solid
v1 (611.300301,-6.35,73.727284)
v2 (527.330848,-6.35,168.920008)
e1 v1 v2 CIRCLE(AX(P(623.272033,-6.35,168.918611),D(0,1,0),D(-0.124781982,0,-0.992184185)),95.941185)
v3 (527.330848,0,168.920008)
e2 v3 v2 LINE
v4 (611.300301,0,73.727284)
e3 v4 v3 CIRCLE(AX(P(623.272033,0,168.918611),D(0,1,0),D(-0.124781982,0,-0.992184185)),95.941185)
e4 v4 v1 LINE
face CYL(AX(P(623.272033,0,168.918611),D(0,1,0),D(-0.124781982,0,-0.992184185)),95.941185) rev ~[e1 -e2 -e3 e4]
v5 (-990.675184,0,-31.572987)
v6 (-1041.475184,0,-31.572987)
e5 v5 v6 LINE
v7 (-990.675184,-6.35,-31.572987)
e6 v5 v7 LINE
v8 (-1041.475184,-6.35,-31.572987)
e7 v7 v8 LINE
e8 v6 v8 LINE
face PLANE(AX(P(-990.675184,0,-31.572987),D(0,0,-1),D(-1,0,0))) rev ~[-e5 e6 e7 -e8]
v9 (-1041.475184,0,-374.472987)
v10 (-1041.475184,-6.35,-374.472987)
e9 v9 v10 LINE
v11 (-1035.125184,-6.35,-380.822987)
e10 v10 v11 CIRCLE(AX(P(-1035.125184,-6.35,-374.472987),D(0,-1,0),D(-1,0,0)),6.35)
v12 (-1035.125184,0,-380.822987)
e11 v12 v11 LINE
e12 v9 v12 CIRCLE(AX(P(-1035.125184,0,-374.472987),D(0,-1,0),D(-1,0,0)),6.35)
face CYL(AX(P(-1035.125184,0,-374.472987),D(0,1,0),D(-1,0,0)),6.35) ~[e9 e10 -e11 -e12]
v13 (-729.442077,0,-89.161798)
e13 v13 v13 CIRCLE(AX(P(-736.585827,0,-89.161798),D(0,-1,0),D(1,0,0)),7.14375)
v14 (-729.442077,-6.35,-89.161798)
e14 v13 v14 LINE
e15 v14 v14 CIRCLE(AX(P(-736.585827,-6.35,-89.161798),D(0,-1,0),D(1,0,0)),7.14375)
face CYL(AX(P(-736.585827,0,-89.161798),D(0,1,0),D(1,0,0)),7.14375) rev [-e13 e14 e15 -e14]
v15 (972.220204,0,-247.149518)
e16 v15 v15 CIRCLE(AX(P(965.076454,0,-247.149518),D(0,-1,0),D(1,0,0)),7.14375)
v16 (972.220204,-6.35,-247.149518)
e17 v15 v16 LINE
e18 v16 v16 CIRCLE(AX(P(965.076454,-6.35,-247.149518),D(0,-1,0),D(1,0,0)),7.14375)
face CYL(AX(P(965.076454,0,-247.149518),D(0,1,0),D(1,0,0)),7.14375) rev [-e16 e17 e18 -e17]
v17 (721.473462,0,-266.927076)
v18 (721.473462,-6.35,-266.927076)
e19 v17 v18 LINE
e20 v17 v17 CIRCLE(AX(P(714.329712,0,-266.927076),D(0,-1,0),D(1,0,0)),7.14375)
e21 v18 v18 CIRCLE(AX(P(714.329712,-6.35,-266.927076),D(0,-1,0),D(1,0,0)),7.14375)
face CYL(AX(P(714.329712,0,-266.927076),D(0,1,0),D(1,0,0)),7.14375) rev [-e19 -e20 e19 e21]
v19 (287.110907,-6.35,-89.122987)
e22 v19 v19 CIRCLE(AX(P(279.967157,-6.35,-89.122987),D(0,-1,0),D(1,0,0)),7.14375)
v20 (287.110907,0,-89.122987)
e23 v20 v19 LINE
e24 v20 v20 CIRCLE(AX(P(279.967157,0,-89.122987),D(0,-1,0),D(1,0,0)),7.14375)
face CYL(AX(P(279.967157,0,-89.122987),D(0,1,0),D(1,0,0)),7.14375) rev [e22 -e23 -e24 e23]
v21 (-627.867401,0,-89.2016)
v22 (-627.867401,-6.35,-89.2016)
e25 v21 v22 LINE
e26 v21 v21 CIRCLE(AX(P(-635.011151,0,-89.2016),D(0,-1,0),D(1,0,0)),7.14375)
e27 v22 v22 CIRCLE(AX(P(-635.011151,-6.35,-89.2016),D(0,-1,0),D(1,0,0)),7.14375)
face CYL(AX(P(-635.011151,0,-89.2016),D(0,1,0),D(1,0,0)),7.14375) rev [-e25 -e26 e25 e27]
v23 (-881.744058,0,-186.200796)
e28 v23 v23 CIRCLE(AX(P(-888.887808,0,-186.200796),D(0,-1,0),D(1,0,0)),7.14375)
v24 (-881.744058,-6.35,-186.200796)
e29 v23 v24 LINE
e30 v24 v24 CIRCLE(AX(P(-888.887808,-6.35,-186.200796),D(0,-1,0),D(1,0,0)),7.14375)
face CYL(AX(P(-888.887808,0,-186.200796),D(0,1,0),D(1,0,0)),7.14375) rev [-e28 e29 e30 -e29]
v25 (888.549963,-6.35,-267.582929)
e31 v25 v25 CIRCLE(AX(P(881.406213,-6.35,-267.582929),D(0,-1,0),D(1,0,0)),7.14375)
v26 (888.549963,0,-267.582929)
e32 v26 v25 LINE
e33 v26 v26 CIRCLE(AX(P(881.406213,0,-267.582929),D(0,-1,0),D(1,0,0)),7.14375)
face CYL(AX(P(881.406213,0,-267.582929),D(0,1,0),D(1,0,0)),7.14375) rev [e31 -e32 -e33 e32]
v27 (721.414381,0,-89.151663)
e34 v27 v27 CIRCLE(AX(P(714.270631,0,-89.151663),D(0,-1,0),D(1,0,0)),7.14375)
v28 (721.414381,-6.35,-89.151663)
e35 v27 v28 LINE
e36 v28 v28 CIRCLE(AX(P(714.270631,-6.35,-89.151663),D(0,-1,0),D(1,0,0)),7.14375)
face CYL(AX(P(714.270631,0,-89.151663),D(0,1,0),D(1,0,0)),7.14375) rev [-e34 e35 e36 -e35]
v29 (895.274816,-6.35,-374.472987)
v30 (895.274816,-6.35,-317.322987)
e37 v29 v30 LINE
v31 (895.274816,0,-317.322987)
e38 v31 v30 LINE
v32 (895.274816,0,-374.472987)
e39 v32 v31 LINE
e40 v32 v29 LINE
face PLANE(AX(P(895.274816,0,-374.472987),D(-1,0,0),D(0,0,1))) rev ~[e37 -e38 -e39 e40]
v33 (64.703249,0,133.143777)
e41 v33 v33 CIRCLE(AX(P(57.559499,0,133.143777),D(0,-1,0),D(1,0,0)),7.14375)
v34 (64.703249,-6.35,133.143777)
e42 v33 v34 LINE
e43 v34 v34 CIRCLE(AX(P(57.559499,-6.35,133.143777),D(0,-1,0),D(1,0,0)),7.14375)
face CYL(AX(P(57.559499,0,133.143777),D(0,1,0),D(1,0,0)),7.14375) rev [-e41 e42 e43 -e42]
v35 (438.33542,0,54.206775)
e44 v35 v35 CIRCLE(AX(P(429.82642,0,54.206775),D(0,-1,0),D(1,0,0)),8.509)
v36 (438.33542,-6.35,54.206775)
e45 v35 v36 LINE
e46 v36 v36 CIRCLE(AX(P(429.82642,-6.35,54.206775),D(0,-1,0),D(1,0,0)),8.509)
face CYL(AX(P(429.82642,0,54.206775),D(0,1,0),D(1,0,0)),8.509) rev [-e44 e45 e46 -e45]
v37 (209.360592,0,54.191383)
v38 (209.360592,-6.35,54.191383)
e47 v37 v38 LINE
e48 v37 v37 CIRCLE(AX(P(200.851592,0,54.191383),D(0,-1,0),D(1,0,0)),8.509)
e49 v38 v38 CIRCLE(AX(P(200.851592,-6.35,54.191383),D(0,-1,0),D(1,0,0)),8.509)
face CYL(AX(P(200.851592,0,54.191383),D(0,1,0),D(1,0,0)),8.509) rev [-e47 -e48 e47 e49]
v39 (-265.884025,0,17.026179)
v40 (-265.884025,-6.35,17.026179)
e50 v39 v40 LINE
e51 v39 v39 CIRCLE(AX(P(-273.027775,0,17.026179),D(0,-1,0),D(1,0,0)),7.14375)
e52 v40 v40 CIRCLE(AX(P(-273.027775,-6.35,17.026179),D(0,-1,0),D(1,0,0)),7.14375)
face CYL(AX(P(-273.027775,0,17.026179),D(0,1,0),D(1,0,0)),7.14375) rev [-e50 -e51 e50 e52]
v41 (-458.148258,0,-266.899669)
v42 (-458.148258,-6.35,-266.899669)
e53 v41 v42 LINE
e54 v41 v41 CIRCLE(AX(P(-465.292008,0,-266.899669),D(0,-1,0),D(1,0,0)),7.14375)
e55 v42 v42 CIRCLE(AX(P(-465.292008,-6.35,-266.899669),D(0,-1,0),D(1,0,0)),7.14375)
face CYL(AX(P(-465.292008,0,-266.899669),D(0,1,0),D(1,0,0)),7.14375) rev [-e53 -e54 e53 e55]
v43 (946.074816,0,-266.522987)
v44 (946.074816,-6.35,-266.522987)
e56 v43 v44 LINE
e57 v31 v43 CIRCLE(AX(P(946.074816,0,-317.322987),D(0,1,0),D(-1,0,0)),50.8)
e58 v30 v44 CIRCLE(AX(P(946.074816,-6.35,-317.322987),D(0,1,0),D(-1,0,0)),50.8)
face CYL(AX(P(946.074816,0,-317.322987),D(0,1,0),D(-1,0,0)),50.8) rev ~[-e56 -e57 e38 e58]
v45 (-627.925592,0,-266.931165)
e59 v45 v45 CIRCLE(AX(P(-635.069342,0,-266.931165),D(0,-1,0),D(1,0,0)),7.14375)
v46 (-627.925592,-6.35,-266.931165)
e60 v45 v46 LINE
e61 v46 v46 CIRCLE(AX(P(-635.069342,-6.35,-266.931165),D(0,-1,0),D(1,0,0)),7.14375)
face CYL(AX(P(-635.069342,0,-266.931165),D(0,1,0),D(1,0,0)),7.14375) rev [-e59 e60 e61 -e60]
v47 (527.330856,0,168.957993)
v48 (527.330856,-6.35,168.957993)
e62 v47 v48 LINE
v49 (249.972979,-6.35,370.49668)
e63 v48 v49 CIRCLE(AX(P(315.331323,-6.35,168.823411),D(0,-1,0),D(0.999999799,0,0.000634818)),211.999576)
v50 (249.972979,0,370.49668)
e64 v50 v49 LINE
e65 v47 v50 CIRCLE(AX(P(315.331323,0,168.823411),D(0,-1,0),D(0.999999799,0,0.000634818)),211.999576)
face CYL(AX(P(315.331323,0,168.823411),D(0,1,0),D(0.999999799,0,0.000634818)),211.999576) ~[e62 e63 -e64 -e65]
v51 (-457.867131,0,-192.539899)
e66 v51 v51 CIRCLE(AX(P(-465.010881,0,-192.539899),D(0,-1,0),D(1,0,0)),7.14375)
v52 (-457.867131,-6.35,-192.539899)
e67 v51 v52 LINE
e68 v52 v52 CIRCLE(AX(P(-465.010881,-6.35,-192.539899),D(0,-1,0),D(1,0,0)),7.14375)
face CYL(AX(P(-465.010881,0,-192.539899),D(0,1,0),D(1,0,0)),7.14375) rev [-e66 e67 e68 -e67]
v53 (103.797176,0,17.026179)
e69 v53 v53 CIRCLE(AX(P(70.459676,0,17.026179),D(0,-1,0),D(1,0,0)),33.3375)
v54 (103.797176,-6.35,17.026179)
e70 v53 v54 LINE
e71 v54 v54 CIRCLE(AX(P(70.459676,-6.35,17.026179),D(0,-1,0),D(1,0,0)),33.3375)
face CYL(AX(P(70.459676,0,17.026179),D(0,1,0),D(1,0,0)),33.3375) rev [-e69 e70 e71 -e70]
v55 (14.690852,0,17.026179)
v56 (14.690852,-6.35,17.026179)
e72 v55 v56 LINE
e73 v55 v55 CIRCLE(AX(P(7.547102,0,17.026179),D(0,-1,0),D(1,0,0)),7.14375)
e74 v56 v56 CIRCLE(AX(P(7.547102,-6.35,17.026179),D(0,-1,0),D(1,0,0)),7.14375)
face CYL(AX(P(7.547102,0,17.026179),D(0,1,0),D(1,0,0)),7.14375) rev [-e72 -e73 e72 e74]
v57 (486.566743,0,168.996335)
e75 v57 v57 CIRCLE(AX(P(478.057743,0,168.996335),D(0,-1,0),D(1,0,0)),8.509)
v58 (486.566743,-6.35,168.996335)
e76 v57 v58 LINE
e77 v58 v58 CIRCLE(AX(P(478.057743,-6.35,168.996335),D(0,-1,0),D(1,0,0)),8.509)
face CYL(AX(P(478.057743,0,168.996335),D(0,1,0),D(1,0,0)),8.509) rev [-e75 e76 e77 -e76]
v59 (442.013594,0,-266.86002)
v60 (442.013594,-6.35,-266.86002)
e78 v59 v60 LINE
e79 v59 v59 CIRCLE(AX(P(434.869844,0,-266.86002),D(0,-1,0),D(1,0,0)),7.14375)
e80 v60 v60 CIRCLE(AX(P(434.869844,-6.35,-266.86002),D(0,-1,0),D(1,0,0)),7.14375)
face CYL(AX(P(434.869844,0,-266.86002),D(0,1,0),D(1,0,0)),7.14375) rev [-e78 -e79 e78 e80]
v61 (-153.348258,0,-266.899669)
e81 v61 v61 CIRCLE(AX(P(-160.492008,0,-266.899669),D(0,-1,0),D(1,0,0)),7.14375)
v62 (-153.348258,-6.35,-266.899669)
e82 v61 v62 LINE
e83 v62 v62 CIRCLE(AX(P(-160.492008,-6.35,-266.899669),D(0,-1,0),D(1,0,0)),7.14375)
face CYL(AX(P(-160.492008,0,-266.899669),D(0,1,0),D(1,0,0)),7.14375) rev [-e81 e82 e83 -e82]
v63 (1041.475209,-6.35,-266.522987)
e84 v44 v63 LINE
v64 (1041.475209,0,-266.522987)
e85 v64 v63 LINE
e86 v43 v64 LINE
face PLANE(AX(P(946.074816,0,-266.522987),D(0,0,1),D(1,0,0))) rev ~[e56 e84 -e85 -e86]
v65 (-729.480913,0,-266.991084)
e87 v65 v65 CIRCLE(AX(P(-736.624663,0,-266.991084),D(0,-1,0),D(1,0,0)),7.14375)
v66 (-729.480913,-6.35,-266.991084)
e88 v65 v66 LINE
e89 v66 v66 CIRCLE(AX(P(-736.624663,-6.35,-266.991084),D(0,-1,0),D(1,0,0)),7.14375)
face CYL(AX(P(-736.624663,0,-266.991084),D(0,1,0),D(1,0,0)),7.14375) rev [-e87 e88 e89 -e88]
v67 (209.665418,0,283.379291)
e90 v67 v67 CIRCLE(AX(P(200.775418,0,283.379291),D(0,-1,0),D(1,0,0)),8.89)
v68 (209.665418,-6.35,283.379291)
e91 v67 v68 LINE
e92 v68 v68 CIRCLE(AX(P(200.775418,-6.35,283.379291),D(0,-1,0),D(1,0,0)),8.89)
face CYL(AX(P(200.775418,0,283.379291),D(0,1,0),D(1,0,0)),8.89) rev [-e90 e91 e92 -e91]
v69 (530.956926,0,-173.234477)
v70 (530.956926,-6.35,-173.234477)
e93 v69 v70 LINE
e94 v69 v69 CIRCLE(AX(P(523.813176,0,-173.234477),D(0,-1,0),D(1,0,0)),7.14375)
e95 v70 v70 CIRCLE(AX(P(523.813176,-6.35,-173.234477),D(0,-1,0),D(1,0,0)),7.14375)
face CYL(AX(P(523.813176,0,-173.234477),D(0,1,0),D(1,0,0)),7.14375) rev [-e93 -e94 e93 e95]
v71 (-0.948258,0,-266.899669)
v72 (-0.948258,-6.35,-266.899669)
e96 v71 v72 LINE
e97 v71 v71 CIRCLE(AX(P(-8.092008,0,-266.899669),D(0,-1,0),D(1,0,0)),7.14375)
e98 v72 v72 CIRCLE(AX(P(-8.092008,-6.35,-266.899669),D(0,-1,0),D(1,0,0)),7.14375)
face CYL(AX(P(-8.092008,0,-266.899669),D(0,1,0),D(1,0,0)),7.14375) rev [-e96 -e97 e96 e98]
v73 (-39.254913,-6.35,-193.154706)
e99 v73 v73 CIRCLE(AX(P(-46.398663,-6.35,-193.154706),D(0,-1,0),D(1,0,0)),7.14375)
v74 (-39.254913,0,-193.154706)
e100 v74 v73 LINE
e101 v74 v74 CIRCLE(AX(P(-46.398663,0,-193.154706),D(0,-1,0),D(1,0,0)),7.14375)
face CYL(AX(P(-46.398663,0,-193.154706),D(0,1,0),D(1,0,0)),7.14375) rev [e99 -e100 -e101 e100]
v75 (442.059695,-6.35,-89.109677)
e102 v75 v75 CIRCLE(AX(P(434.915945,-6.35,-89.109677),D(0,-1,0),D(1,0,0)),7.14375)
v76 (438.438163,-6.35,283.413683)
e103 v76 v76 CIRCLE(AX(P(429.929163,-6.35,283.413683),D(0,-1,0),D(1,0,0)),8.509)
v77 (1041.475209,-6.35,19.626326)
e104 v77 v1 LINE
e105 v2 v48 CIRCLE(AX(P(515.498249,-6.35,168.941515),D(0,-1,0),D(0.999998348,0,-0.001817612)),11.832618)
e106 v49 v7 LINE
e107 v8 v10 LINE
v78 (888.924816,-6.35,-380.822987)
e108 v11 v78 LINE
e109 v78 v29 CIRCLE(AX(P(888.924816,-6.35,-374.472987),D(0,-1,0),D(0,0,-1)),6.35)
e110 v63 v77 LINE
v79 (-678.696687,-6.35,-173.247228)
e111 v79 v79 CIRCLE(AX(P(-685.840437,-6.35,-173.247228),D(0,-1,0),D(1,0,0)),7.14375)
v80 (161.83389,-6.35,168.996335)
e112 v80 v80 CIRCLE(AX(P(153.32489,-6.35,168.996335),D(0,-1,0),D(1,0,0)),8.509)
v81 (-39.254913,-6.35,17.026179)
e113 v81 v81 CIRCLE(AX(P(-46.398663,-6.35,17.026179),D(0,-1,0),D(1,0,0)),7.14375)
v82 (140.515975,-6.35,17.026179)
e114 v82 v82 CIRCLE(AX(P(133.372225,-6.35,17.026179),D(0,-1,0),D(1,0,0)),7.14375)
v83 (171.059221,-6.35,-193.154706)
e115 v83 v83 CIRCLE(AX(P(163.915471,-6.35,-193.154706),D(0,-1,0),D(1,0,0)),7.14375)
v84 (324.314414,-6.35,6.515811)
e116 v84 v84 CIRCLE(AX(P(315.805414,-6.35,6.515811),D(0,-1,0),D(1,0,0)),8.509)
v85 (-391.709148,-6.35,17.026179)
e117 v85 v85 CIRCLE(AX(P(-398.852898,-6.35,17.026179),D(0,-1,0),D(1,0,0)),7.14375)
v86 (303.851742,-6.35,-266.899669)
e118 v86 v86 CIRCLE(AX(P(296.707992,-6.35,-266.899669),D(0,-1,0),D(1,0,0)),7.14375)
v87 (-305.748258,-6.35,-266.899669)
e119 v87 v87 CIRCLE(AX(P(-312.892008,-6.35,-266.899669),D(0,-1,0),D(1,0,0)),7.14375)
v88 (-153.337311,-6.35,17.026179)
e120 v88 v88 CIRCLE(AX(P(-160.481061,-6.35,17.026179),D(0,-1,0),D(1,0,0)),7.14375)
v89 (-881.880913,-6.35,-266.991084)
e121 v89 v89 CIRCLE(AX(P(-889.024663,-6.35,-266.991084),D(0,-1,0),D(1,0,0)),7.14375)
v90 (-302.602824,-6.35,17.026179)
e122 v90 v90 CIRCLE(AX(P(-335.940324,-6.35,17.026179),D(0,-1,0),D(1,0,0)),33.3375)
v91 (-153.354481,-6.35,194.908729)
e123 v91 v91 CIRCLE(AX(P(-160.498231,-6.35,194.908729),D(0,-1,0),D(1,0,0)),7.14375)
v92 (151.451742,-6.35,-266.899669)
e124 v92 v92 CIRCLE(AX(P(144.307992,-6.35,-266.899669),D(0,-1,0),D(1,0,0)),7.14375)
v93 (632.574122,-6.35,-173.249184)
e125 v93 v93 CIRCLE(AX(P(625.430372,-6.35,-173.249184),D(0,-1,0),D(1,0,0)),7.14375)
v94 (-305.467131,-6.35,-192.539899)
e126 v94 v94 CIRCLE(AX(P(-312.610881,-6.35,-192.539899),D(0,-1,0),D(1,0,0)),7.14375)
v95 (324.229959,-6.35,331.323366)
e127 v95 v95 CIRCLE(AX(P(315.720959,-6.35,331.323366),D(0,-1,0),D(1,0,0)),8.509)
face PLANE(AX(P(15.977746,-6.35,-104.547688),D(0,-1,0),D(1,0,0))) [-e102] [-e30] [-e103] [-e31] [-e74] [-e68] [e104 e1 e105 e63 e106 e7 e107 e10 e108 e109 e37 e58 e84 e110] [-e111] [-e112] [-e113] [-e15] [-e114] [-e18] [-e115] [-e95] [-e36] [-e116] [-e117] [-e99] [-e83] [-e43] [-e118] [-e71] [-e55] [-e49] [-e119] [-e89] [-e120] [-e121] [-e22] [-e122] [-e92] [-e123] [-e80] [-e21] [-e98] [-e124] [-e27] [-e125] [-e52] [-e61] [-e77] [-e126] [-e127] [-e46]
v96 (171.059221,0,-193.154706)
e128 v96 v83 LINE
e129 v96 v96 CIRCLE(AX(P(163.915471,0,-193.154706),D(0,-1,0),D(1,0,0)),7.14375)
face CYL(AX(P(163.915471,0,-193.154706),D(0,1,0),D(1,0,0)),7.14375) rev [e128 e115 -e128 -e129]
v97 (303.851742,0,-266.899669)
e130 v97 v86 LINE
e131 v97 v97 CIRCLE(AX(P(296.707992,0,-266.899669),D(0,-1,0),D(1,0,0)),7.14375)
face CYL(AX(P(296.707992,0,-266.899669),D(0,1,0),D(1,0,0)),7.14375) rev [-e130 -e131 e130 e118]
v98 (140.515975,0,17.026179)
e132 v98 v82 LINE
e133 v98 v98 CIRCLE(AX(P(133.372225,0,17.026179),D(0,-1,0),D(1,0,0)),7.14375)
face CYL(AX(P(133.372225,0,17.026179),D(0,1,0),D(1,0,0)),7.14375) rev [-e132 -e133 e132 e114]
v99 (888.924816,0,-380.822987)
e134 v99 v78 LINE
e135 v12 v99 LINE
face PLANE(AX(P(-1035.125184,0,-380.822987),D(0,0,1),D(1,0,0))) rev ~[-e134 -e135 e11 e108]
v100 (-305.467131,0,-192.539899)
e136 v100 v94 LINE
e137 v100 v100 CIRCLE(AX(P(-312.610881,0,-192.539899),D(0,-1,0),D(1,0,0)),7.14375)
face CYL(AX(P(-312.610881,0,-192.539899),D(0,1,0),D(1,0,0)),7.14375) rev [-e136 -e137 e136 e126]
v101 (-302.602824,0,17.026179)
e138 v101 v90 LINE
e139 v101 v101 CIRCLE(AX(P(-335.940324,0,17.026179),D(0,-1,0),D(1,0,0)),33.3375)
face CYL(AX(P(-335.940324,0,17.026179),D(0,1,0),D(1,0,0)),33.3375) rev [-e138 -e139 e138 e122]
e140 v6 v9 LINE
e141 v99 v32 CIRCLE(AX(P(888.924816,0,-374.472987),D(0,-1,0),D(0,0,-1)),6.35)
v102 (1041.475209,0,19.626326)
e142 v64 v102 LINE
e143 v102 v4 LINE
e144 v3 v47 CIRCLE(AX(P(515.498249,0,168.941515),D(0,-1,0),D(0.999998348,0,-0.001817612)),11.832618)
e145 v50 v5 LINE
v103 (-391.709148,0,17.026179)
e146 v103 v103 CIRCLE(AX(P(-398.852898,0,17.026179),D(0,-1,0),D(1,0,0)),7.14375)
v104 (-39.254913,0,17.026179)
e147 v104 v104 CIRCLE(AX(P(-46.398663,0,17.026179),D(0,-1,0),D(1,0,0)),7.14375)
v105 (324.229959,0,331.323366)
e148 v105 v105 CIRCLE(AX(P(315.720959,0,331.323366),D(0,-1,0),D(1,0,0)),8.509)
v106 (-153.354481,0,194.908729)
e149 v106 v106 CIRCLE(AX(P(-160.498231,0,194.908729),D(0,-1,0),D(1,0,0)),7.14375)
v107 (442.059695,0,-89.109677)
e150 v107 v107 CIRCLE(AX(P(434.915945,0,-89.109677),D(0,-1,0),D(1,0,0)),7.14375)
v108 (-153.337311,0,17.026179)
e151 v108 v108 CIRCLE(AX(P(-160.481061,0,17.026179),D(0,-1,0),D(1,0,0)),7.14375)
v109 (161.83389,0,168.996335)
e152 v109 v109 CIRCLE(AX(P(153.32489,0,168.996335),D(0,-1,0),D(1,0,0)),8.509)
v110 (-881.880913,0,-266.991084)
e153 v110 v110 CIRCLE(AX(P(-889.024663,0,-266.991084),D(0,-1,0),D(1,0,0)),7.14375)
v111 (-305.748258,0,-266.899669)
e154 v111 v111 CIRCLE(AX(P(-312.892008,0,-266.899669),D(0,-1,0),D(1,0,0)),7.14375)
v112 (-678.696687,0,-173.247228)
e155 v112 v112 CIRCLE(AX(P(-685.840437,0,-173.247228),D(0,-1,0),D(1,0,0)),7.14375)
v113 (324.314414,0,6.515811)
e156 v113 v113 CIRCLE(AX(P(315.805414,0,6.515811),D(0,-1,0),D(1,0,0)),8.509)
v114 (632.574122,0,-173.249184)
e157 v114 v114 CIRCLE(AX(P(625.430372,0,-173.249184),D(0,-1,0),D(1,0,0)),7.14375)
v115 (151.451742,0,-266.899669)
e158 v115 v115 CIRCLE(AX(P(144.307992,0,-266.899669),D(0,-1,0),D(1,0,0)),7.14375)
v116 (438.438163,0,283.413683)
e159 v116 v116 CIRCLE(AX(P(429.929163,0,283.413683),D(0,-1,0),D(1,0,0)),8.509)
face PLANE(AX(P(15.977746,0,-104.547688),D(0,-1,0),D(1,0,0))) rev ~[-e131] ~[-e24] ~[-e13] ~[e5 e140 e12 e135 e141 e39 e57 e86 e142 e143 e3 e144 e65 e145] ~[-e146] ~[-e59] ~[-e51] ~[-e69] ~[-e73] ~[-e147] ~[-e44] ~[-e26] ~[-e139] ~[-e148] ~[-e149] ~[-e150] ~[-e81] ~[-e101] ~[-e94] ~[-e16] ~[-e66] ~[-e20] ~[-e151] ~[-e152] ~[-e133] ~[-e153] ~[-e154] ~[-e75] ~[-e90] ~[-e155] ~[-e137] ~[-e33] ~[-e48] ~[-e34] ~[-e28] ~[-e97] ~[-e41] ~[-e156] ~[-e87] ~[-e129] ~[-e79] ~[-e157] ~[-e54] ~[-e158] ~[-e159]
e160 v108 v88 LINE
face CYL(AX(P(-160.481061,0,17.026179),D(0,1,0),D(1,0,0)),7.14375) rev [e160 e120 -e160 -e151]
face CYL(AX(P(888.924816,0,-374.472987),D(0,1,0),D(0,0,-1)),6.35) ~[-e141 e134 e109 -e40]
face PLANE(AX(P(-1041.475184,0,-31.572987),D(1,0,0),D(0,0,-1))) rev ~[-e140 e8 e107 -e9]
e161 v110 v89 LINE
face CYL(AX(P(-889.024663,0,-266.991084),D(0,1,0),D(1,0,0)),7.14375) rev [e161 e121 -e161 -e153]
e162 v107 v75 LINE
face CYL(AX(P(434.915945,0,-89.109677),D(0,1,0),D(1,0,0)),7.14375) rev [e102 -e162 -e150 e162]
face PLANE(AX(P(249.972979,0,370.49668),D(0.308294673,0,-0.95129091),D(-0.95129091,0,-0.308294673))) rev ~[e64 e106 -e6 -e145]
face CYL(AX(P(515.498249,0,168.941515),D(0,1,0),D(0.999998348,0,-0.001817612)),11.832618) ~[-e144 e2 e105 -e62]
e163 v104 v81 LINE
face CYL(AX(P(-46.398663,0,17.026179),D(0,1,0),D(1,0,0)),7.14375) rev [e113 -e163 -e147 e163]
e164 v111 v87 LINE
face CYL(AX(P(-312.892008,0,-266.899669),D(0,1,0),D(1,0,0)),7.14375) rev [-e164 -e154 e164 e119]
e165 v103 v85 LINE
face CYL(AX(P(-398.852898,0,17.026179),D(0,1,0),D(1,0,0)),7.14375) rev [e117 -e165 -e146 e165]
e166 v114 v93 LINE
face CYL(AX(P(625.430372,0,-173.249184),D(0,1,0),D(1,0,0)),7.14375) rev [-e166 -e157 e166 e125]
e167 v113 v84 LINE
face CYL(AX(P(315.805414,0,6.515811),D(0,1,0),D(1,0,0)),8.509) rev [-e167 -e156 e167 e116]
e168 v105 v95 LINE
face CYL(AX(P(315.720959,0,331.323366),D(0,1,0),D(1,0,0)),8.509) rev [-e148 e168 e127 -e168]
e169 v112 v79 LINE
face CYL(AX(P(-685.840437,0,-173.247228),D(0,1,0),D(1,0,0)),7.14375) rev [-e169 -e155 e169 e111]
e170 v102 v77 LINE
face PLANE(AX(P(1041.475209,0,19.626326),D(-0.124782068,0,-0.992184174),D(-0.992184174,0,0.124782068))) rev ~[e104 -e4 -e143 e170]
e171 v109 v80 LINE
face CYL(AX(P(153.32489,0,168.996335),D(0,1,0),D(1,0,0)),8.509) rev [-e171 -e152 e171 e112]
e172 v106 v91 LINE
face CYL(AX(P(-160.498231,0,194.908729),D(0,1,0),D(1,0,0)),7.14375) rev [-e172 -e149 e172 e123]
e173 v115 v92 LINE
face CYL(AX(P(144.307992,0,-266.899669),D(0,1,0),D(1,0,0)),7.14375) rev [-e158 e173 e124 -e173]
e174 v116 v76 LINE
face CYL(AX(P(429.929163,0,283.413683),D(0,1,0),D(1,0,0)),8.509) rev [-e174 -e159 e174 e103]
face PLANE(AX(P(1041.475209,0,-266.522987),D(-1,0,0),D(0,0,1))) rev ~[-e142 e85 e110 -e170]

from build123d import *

# Parameters (mm, degrees)
F0_R     = 7.14375
F0_R_2   = 33.3375
F0_R_3   = 8.509
F0_R_4   = 8.89
F1_DEPTH = 6.35


# Not quite as in the source:
# - ends of sketch curves that miss each other by under 0.0002 mm in the source are joined


with BuildPart() as f1:
    # F0 (on Front) → F1 (new body)
    with BuildSketch(Plane.XZ):
        with BuildLine():
            Line((-990.675184, -31.5729874), (-1041.475184, -31.5729874))
            Line((-1041.475184, -31.5729874), (-1041.475184, -374.4729874))
            ThreePointArc((-1041.475184, -374.4729874), (-1039.6153120605, -378.9631154605), (-1035.125184, -380.8229874))
            Line((-1035.125184, -380.8229874), (888.924816, -380.8229874))
            ThreePointArc((888.924816, -380.8229874), (893.4149440605, -378.9631154605), (895.274816, -374.4729874))
            Line((895.274816, -374.4729874), (895.274816, -317.3229874))
            ThreePointArc((895.274816, -317.3229874), (910.1537915157, -281.4019629157), (946.074816, -266.5229874))
            Line((946.074816, -266.5229874), (1041.4752094, -266.5229874))
            Line((1041.4752094, -266.5229874), (1041.4752094, 19.626326))
            Line((1041.4752094, 19.626326), (611.3003013693, 73.7272843556))
            ThreePointArc((611.3003013693, 73.7272843556), (551.322654557, 105.4521002182), (527.3308478102, 168.920007602))
            ThreePointArc((527.3308478102, 168.920007602), (527.3308670888, 168.9390000629), (527.3308558827, 168.9579925234))
            ThreePointArc((527.3308558827, 168.9579925234), (439.9522285654, 340.3269099665), (249.9729787047, 370.4966796024))
            Line((249.9729787047, 370.4966796024), (-990.675184, -31.5729874))
        make_face()
        with Locations((-889.0246634, -266.991084)):
            Circle(F0_R, mode=Mode.SUBTRACT)
        with Locations((-736.6246634, -266.991084)):
            Circle(F0_R, mode=Mode.SUBTRACT)
        with Locations((-635.069342, -266.9311654)):
            Circle(F0_R, mode=Mode.SUBTRACT)
        with Locations((-465.2920082, -266.8996694)):
            Circle(F0_R, mode=Mode.SUBTRACT)
        with Locations((-312.8920082, -266.8996694)):
            Circle(F0_R, mode=Mode.SUBTRACT)
        with Locations((-465.010881, -192.5398994)):
            Circle(F0_R, mode=Mode.SUBTRACT)
        with Locations((-312.610881, -192.5398994)):
            Circle(F0_R, mode=Mode.SUBTRACT)
        with Locations((-160.4920082, -266.8996694)):
            Circle(F0_R, mode=Mode.SUBTRACT)
        with Locations((-8.0920082, -266.8996694)):
            Circle(F0_R, mode=Mode.SUBTRACT)
        with Locations((-46.3986626, -193.1547064)):
            Circle(F0_R, mode=Mode.SUBTRACT)
        with Locations((-888.8878082, -186.200796)):
            Circle(F0_R, mode=Mode.SUBTRACT)
        with Locations((-685.8404368, -173.2472278)):
            Circle(F0_R, mode=Mode.SUBTRACT)
        with Locations((-736.5858268, -89.1617978)):
            Circle(F0_R, mode=Mode.SUBTRACT)
        with Locations((-635.0111506, -89.2015996)):
            Circle(F0_R, mode=Mode.SUBTRACT)
        with Locations((144.3079918, -266.8996694)):
            Circle(F0_R, mode=Mode.SUBTRACT)
        with Locations((163.915471, -193.1547064)):
            Circle(F0_R, mode=Mode.SUBTRACT)
        with Locations((296.7079918, -266.8996694)):
            Circle(F0_R, mode=Mode.SUBTRACT)
        with Locations((434.869844, -266.86002)):
            Circle(F0_R, mode=Mode.SUBTRACT)
        with Locations((714.3297118, -266.927076)):
            Circle(F0_R, mode=Mode.SUBTRACT)
        with Locations((881.4062128, -267.5829294)):
            Circle(F0_R, mode=Mode.SUBTRACT)
        with Locations((965.0764544, -247.1495184)):
            Circle(F0_R, mode=Mode.SUBTRACT)
        with Locations((279.9671566, -89.1229866)):
            Circle(F0_R, mode=Mode.SUBTRACT)
        with Locations((434.915945, -89.109677)):
            Circle(F0_R, mode=Mode.SUBTRACT)
        with Locations((523.8131764, -173.234477)):
            Circle(F0_R, mode=Mode.SUBTRACT)
        with Locations((625.4303722, -173.2491836)):
            Circle(F0_R, mode=Mode.SUBTRACT)
        with Locations((714.2706314, -89.1516632)):
            Circle(F0_R, mode=Mode.SUBTRACT)
        with Locations((-398.852898, 17.0261788)):
            Circle(F0_R, mode=Mode.SUBTRACT)
        with Locations((-335.9403238, 17.0261788)):
            Circle(F0_R_2, mode=Mode.SUBTRACT)
        with Locations((-273.027775, 17.0261788)):
            Circle(F0_R, mode=Mode.SUBTRACT)
        with Locations((-160.4810608, 17.0261788)):
            Circle(F0_R, mode=Mode.SUBTRACT)
        with Locations((-46.3986626, 17.0261788)):
            Circle(F0_R, mode=Mode.SUBTRACT)
        with Locations((-160.4982312, 194.9087288)):
            Circle(F0_R, mode=Mode.SUBTRACT)
        with Locations((7.547102, 17.0261788)):
            Circle(F0_R, mode=Mode.SUBTRACT)
        with Locations((70.4596762, 17.0261788)):
            Circle(F0_R_2, mode=Mode.SUBTRACT)
        with Locations((133.372225, 17.0261788)):
            Circle(F0_R, mode=Mode.SUBTRACT)
        with Locations((200.8515922, 54.1913826)):
            Circle(F0_R_3, mode=Mode.SUBTRACT)
        with Locations((315.8054136, 6.5158112)):
            Circle(F0_R_3, mode=Mode.SUBTRACT)
        with Locations((429.82642, 54.206775)):
            Circle(F0_R_3, mode=Mode.SUBTRACT)
        with Locations((57.5594988, 133.1437774)):
            Circle(F0_R, mode=Mode.SUBTRACT)
        with Locations((153.3248902, 168.9963346)):
            Circle(F0_R_3, mode=Mode.SUBTRACT)
        with Locations((478.0577434, 168.9963346)):
            Circle(F0_R_3, mode=Mode.SUBTRACT)
        with Locations((200.7754176, 283.379291)):
            Circle(F0_R_4, mode=Mode.SUBTRACT)
        with Locations((429.929163, 283.4136826)):
            Circle(F0_R_3, mode=Mode.SUBTRACT)
        with Locations((315.7209586, 331.3233658)):
            Circle(F0_R_3, mode=Mode.SUBTRACT)
    extrude(amount=F1_DEPTH)


solid = f1.part
